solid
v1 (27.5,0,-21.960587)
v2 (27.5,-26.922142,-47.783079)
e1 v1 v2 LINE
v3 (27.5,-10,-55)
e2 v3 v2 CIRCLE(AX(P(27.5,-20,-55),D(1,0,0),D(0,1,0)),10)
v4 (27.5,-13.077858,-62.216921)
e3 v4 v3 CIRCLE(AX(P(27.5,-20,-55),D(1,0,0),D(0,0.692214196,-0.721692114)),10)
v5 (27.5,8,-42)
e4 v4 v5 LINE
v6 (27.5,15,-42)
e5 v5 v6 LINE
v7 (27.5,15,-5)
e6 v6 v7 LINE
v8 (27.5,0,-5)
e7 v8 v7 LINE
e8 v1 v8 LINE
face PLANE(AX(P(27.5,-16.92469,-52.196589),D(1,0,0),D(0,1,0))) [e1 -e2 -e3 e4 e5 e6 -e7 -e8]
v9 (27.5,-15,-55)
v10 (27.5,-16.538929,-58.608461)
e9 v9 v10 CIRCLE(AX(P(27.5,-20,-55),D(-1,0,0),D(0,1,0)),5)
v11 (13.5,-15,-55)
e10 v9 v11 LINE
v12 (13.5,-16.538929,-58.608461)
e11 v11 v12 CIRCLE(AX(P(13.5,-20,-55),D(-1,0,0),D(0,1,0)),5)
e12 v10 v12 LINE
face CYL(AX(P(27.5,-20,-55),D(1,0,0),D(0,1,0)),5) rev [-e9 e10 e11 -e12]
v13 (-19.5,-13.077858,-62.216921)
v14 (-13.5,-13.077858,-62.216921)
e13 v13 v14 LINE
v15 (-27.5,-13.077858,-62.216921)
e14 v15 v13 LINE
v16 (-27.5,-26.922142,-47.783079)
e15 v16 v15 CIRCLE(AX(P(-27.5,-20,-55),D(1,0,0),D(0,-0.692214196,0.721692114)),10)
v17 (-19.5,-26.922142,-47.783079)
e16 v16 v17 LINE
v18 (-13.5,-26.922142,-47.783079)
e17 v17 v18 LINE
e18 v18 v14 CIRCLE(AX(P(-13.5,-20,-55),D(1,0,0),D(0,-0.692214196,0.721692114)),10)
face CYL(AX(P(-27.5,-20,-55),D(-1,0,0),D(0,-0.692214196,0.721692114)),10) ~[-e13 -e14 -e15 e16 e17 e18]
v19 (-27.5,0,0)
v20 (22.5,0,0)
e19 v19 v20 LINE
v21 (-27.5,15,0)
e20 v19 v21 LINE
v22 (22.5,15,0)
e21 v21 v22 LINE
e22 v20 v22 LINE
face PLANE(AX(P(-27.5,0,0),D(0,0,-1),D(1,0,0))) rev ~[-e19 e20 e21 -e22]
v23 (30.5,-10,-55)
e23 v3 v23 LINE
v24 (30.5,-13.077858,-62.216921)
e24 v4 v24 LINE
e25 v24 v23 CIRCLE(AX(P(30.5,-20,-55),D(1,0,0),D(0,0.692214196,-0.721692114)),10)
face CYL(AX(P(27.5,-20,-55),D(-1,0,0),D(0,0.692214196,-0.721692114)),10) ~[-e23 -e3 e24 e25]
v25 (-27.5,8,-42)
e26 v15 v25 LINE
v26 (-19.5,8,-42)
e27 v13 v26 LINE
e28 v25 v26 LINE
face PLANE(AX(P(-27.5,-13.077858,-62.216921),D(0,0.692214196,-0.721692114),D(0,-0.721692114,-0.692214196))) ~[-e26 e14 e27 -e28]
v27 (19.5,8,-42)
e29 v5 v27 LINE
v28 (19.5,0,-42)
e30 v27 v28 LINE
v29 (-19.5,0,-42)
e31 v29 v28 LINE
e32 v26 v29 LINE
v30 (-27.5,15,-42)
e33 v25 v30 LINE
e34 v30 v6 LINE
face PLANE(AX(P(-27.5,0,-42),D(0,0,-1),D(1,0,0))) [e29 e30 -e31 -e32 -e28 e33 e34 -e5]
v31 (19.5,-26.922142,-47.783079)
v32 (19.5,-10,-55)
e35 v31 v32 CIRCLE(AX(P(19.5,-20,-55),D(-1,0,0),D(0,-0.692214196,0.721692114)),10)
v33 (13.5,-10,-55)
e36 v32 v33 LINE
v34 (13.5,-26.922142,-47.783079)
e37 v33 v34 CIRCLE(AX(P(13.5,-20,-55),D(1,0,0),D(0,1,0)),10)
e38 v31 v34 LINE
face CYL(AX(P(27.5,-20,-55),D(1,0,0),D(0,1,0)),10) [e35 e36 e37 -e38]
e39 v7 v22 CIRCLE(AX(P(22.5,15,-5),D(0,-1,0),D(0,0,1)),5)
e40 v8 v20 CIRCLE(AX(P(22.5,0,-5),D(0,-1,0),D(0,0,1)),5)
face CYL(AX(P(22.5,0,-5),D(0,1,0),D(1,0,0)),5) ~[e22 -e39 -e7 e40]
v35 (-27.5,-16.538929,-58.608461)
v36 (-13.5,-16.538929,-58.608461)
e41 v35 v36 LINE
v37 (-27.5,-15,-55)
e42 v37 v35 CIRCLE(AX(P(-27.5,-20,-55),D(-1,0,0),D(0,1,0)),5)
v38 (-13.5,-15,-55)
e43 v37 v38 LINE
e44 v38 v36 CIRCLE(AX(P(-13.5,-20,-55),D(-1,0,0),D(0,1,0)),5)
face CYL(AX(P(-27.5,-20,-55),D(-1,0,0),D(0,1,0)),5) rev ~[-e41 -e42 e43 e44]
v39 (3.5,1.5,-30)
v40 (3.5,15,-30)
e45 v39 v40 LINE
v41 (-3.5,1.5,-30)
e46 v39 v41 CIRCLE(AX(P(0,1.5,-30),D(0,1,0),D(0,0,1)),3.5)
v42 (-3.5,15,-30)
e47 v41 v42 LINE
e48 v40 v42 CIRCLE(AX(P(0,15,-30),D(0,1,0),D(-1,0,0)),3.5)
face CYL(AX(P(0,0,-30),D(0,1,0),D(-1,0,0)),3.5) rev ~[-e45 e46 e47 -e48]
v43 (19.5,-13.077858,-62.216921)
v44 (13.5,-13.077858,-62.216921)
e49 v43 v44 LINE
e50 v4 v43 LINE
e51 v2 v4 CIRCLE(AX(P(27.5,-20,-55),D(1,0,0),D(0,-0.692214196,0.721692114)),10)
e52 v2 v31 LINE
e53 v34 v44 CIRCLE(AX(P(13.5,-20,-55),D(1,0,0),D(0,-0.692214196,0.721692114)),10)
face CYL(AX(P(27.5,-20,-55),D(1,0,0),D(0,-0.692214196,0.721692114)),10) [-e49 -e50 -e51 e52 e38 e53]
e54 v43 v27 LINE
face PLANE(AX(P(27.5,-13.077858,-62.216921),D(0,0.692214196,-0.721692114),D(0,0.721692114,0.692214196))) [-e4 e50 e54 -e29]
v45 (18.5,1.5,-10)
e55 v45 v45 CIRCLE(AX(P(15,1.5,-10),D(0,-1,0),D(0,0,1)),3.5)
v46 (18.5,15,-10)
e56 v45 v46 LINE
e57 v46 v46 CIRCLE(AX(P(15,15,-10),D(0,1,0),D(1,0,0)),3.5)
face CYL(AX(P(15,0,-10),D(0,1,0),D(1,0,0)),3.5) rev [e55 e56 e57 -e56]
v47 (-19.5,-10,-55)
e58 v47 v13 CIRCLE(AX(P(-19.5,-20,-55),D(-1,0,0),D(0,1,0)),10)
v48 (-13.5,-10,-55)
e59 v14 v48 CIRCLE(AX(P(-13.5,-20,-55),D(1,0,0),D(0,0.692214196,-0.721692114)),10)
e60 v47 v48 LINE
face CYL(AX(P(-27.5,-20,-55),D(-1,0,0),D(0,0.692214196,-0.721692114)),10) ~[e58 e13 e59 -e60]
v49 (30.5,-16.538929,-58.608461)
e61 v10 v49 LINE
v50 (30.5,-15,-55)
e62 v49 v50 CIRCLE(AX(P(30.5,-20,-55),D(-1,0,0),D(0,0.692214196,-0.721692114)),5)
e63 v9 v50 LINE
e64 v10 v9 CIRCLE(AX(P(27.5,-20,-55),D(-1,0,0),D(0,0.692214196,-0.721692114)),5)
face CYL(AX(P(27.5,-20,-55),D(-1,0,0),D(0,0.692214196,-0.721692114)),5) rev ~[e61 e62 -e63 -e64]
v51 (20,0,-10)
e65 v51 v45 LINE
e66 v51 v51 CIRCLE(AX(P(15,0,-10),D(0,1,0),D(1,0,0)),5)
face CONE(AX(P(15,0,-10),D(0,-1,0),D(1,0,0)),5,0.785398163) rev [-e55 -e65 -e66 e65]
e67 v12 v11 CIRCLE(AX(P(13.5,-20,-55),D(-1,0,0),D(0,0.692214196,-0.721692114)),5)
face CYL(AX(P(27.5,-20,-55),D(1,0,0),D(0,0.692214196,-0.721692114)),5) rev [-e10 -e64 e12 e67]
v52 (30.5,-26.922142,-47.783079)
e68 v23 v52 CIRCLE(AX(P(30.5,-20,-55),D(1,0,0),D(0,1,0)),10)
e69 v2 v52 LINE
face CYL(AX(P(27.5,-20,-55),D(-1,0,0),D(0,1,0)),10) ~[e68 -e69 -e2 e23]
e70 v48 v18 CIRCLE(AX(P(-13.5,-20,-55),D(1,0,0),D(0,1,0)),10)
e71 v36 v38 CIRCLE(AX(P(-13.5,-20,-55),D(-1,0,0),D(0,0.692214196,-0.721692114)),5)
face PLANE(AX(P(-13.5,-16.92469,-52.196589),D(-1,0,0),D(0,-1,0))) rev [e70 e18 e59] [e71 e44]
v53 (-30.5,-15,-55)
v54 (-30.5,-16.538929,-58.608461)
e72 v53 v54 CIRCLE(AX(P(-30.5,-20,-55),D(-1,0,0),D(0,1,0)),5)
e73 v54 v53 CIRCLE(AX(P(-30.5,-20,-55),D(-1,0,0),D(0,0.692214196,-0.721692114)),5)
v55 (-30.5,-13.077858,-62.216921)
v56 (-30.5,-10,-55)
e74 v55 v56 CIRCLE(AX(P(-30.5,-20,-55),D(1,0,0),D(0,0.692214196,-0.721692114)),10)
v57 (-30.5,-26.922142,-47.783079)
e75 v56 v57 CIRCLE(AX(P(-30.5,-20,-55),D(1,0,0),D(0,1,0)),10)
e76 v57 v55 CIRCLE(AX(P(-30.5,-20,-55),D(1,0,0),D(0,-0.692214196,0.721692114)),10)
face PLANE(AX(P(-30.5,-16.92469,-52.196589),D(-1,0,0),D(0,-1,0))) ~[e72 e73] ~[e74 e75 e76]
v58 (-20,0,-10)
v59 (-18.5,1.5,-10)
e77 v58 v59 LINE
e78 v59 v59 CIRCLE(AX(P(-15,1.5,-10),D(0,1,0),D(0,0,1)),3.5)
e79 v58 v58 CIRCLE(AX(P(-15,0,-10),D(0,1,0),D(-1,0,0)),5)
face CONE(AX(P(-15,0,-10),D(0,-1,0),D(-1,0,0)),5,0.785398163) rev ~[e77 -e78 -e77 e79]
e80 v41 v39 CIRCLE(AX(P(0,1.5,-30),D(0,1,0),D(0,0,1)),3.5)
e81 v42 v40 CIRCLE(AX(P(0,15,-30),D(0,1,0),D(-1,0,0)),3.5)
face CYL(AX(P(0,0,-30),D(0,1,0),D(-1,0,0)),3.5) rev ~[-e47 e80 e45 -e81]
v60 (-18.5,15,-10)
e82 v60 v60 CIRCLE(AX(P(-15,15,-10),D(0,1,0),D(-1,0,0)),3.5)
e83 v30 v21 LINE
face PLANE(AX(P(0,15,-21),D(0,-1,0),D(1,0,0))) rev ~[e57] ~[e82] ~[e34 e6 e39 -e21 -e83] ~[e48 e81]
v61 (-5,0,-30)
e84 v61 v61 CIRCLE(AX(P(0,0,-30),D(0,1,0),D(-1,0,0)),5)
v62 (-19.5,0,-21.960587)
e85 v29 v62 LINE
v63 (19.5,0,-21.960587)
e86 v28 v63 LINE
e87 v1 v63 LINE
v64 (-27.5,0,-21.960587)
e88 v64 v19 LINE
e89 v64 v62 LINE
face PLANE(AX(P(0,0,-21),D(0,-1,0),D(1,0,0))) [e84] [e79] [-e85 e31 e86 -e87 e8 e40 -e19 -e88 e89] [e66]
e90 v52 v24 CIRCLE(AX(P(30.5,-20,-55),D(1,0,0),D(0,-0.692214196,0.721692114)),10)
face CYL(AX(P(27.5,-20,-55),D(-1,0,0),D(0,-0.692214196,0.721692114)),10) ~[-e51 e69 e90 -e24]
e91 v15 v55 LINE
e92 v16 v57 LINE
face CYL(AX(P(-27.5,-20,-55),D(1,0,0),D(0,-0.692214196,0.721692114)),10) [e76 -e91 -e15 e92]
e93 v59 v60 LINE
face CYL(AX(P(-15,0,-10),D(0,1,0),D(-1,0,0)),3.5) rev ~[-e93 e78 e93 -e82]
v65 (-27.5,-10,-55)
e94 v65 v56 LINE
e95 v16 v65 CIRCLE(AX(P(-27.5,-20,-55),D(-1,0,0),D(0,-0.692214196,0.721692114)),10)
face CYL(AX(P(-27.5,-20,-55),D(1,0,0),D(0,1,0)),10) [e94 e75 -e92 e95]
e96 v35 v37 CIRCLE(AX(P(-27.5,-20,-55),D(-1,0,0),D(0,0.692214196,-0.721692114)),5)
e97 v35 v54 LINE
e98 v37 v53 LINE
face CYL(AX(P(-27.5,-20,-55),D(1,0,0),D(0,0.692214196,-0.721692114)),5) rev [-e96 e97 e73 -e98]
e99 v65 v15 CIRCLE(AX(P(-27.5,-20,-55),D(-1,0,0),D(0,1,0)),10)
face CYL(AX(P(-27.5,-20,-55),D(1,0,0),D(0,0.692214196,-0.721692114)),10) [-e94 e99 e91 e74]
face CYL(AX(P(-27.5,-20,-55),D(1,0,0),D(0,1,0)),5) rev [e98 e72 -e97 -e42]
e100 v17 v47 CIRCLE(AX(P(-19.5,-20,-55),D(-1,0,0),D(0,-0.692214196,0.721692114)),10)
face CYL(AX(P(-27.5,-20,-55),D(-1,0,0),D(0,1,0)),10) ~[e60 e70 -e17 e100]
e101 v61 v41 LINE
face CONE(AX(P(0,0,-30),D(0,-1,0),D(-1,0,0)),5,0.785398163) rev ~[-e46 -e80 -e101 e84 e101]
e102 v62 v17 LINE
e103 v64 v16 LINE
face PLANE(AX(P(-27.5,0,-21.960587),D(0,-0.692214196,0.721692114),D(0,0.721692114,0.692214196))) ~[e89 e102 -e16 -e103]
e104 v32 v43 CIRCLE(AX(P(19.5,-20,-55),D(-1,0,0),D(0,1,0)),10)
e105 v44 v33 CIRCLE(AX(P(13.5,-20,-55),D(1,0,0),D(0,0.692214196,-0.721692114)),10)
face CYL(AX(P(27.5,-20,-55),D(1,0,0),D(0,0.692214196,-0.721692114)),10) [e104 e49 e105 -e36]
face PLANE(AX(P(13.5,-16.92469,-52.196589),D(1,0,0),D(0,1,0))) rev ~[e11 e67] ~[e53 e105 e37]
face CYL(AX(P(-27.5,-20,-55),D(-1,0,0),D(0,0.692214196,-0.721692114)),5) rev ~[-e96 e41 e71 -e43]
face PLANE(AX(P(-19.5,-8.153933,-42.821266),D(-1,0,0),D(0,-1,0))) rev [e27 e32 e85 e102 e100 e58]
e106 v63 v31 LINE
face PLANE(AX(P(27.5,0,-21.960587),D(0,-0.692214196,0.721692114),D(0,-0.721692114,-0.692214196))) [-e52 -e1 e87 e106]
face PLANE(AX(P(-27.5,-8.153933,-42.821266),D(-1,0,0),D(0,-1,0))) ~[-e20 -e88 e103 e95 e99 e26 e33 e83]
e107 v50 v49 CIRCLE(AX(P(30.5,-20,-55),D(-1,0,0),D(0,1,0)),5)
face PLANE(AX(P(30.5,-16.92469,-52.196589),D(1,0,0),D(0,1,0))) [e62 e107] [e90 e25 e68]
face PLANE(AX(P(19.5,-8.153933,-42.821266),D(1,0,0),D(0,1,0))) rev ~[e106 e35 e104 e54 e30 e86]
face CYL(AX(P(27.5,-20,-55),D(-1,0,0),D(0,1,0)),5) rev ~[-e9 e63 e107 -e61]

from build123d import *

# Parameters (mm, degrees)
F0_W           = 55
F0_H           = 42
F1_DEPTH       = 15
F3_DEPTH       = 8
F4_DEPTH       = 14
F4_DEPTH_BACK  = 3
F6_D           = 7
F6_CSINK_D     = 10
F6_CSINK_ANGLE = 90
F7_R           = 5


# Not quite as in the source:
# - a pattern or mirror of a feature is missing from the dataset's text; its kind, count and spacing are read off the source's solid


with BuildPart() as f1:
    # F0 (on Front) → F1 (new body)
    with BuildSketch(Plane.XZ):
        with Locations((0, -21)):
            Rectangle(F0_W, F0_H)
    extrude(amount=-F1_DEPTH)

    # F2 (on face) → F3 (join)
    with BuildSketch(Plane.YZ.offset(27.5)):
        with BuildLine():
            Line((0, -42), (0, -21.960586854))
            Line((0, -21.960586854), (-26.9221419573, -47.7830788612))
            ThreePointArc((-26.9221419573, -47.7830788612), (-16.0770814164, -45.8015919972), (-10, -55))
            ThreePointArc((-10, -55), (-10.8015919972, -58.9229185836), (-13.0778580427, -62.2169211388))
            Line((-13.0778580427, -62.2169211388), (8, -42))
            Line((8, -42), (0, -42))
        make_face()
    f3 = extrude(amount=-F3_DEPTH)

    # F3_copies: F3 across plane
    add(f3.mirror(Plane(origin=(0, 0, 0), x_dir=(0, 0, -1), z_dir=(-1, 0, 0))))

    # F2 (on face) → F4 (join, two sides)
    with BuildSketch(Plane.YZ.offset(27.5)) as f4_sk:
        with BuildLine():
            ThreePointArc((-10, -55), (-16.0770814164, -45.8015919972), (-26.9221419573, -47.7830788612))
            Line((-26.9221419573, -47.7830788612), (-23.4610709786, -51.3915394306))
            ThreePointArc((-23.4610709786, -51.3915394306), (-18.0385407082, -50.4007959986), (-15, -55))
            ThreePointArc((-15, -55), (-15.4007959986, -56.9614592918), (-16.5389290214, -58.6084605694))
            Line((-16.5389290214, -58.6084605694), (-13.0778580427, -62.2169211388))
            ThreePointArc((-13.0778580427, -62.2169211388), (-10.8015919972, -58.9229185836), (-10, -55))
        make_face()
        with BuildLine():
            Line((-23.4610709786, -51.3915394306), (-26.9221419573, -47.7830788612))
            ThreePointArc((-26.9221419573, -47.7830788612), (-27.2169211388, -61.9221419573), (-13.0778580427, -62.2169211388))
            Line((-13.0778580427, -62.2169211388), (-16.5389290214, -58.6084605694))
            ThreePointArc((-16.5389290214, -58.6084605694), (-23.6084605694, -58.4610709786), (-23.4610709786, -51.3915394306))
        make_face()
    f4 = extrude(amount=-F4_DEPTH) + extrude(f4_sk.sketch, amount=F4_DEPTH_BACK)

    # F4_copies: F4 across plane
    add(f4.mirror(Plane(origin=(0, 0, 0), x_dir=(0, 0, -1), z_dir=(-1, 0, 0))))

    # F6 (through all)
    with Locations(Plane.XZ):
        with Locations((-15, -10), (0, -30)):
            f6 = CounterSinkHole(F6_D / 2, F6_CSINK_D / 2, counter_sink_angle=F6_CSINK_ANGLE)

    # F6_copies: F6 across plane
    add(f6.mirror(Plane(origin=(0, 0, 0), x_dir=(0, 0, 1), z_dir=(1, 0, 0))), mode=Mode.SUBTRACT)

    # F7
    f7_edges = [f1.edges().sort_by_distance(p)[0] for p in [
        (27.5, 7.5, 0),
    ]]
    fillet(f7_edges, radius=F7_R)


solid = f1.part
